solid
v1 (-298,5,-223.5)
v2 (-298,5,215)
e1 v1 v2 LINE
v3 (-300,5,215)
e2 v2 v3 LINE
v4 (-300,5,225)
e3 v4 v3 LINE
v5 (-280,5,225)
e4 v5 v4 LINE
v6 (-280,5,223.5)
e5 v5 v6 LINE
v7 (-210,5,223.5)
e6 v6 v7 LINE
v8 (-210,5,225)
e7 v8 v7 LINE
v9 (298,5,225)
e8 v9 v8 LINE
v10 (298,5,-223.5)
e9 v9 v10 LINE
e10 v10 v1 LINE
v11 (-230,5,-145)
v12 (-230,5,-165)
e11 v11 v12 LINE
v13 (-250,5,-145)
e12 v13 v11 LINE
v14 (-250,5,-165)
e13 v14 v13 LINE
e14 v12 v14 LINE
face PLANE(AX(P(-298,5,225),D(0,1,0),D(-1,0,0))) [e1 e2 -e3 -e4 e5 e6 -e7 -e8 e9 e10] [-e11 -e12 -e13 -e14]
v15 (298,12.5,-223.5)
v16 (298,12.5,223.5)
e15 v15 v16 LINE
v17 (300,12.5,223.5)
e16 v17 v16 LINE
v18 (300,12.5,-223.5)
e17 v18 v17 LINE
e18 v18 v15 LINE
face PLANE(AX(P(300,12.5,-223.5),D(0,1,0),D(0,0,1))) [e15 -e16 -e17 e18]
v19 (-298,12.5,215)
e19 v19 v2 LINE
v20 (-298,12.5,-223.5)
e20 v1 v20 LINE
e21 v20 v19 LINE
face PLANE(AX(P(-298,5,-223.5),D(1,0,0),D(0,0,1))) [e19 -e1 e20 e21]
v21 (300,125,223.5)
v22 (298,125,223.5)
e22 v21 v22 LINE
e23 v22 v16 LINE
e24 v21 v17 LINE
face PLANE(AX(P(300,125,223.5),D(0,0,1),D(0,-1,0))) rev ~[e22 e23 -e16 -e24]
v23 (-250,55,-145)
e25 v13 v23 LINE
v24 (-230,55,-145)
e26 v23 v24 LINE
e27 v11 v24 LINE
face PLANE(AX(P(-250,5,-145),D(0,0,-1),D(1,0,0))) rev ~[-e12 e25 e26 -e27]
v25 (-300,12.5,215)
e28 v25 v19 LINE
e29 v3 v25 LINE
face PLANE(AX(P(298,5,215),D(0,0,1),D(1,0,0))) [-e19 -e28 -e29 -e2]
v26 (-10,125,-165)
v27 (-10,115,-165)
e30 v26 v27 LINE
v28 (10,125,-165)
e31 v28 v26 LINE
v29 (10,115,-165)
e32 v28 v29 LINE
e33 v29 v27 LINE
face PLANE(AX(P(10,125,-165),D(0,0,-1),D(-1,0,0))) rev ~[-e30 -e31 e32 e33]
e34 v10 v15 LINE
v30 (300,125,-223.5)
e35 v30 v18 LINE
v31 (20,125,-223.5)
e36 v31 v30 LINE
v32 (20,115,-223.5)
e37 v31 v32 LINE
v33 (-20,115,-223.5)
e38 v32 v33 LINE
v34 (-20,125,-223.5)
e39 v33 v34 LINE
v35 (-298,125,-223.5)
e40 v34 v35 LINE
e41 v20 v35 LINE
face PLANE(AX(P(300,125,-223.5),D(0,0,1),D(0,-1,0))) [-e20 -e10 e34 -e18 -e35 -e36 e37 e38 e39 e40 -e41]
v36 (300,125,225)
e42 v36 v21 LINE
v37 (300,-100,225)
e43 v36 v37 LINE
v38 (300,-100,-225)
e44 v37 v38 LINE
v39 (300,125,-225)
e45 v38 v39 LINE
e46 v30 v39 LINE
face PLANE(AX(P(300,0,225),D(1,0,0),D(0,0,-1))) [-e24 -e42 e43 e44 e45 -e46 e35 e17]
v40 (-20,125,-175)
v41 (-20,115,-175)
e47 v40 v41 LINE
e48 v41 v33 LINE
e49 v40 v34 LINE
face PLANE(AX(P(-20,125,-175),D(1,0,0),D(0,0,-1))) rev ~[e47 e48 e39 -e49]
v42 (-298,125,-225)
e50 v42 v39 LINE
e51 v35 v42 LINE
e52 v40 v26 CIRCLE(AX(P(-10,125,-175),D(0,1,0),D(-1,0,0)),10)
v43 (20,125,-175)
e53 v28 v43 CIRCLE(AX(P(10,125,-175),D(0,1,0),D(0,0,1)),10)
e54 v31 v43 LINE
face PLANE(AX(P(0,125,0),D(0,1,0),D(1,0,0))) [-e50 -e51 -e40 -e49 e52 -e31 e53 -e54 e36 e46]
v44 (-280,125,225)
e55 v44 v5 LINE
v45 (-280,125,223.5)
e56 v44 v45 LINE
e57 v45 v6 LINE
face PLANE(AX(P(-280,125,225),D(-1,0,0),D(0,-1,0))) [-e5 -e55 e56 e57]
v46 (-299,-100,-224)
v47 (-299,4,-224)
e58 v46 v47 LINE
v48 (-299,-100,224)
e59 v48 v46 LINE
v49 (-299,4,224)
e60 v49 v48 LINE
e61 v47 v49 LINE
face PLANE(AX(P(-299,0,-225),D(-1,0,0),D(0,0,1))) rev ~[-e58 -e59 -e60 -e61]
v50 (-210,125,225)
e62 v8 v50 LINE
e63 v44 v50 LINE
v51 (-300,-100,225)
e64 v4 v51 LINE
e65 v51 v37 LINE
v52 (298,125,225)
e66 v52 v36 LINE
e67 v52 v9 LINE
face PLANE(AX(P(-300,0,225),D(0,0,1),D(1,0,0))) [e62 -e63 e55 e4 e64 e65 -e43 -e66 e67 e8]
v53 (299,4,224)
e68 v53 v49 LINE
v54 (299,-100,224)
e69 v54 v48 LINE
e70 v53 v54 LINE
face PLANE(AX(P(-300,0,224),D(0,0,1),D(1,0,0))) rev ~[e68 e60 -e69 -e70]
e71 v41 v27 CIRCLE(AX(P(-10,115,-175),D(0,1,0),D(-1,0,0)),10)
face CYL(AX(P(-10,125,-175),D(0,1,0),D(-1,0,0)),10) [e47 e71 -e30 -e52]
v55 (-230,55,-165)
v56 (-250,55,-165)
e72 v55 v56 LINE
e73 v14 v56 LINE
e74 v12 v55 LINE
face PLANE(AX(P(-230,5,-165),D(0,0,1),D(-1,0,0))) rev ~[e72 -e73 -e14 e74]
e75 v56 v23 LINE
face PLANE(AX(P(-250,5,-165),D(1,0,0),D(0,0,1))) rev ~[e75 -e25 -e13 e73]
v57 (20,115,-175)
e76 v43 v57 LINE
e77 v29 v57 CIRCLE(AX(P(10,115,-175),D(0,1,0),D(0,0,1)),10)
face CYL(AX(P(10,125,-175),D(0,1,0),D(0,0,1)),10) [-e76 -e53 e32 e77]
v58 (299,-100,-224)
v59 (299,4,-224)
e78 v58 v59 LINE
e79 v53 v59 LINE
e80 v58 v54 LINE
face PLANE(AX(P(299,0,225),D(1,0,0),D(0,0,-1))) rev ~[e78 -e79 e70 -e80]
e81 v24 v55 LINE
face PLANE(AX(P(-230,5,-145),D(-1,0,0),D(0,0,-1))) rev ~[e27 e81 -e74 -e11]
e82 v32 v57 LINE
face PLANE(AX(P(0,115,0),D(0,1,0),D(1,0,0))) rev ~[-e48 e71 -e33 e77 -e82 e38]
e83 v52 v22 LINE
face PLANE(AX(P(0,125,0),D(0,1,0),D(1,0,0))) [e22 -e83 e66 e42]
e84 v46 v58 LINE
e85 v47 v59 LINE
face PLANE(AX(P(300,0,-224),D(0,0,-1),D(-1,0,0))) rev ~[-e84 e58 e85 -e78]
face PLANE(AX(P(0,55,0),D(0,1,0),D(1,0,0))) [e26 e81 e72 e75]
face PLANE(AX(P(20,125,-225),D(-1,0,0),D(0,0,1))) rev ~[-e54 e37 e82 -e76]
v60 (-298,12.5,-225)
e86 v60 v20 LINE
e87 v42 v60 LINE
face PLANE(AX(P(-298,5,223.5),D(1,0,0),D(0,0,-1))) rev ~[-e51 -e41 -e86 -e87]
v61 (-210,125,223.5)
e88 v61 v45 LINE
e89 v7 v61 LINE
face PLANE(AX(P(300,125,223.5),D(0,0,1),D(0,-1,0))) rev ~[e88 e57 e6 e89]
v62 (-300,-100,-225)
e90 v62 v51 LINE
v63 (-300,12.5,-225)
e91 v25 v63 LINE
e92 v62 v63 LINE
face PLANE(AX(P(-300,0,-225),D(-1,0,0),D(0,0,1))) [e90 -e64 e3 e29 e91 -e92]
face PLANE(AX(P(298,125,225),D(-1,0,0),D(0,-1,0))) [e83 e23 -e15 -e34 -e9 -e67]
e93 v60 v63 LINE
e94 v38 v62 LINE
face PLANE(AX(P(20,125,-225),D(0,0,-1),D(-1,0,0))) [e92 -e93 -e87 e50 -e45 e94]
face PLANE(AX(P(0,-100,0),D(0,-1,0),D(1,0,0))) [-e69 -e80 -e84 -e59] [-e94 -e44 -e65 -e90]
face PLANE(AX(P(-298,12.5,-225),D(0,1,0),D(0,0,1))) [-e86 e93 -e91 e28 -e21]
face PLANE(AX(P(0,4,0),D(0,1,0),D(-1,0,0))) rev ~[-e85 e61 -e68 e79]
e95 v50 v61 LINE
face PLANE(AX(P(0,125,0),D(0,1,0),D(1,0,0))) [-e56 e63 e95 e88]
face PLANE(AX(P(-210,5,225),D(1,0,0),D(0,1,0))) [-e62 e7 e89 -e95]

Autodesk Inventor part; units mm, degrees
ref_plane "YZ Plane" through (0, 0, 0) normal (1, 0, 0) x (0, 1, 0)
ref_plane "XZ Plane" through (0, 0, 0) normal (0, 1, 0) x (-1, 0, 0)
ref_plane "XY Plane" through (0, 0, 0) normal (0, 0, 1) x (1, 0, 0)
sketch "Sketch1" plane through (0, 0, 0) normal (0, 1, 0) x (-1, 0, 0)
  line L0 (-300, 225) -> (300, 225)
  line L1 (300, 225) -> (300, -225)
  line L2 (300, -225) -> (-300, -225)
  line L3 (-300, -225) -> (-300, 225)
  line L4 (-300, 225) -> (300, -225) construction
  line L5 (300, 225) -> (-300, -225) construction
  point P0 (0, 0)
  dimension "d0" = 600
  dimension "d1" = 450
extrude "Extrusion1" add sketch "Sketch1" along normal blind 5
sketch "Sketch6" plane through (0, 5, 0) normal (0, 1, 0) x (1, 0, 0)
  line L0 (300, 225) -> (-300, 225) projected
  line L1 (-300, -225) -> (300, -225)
  line L2 (300, -225) -> (300, 225)
  line L3 (300, 225) -> (-300, 225)
  line L4 (-300, 225) -> (-300, -225)
  line L5 (-300, -225) -> (300, 225) construction
  line L6 (300, -225) -> (-300, 225) construction
  line L7 (-298, -223.5) -> (298, -223.5)
  line L8 (298, -223.5) -> (298, 223.5)
  line L9 (298, 223.5) -> (-298, 223.5)
  line L10 (-298, 223.5) -> (-298, -223.5)
  line L11 (-298, -223.5) -> (298, 223.5) construction
  line L12 (298, -223.5) -> (-298, 223.5) construction
  point P0 (0, 0)
  dimension "d26" = 2
extrude "Extrusion7" add sketch "Sketch6" along normal blind 120
sketch "Sketch7" plane through (0, 0, 0) normal (0, -1, 0) x (1, 0, 0)
  line L0 (300, 225) -> (300, -225) projected
  line L1 (-300, 225) -> (300, 225)
  line L2 (300, 225) -> (300, -225)
  line L3 (300, -225) -> (-300, -225)
  line L4 (-300, -225) -> (-300, 225)
  line L5 (-300, 225) -> (300, -225) construction
  line L6 (300, 225) -> (-300, -225) construction
  point P0 (0, 0)
extrude "Extrusion8" add sketch "Sketch7" along normal blind 100
shell "Shell1" thickness 1 removed faces 1 at (-100, -100, 75)
mirror "Mirror1" about plane through (0, 0, 0) normal (0, 0, 1)
sketch "Sketch9" plane through (0, 125, 0) normal (0, 1, 0) x (1, 0, 0)
  line L0 (300, 225) -> (-300, 225) projected
  line L1 (-20, 225) -> (20, 225)
  line L2 (20, 225) -> (20, 175)
  line L3 (10, 165) -> (-10, 165)
  line L4 (-20, 175) -> (-20, 225)
  arc A0 (-20, 175) -> (-10, 165) centre (-10, 175) ccw
  arc A1 (10, 165) -> (20, 175) centre (10, 175) ccw
  point P0 (0, 0)
  point P1 (20, 165)
  point P2 (-20, 165)
  point P3 (0, 225)
  dimension "d37" = 40
  dimension "d38" = 60
  dimension "d39" = 10
extrude "Extrusion10" add sketch "Sketch9" against normal blind 10
sketch "Sketch10" plane through (0, 5, 0) normal (0, 1, 0) x (1, 0, 0)
  line L0 (-230, 165) -> (-250, 165)
  line L1 (-250, 165) -> (-250, 145)
  line L2 (-250, 145) -> (-230, 145)
  line L3 (-230, 145) -> (-230, 165)
  line L4 (-300, 225) -> (-300, -225) projected
  line L5 (300, 225) -> (-300, 225) projected
  point P0 (0, 0)
  point P1 (-250, 155)
  point P2 (-240, 165)
  dimension "d42" = 20
  dimension "d43" = 20
  dimension "d44" = 50
  dimension "d45" = 60
extrude "Extrusion11" add sketch "Sketch10" along normal blind 50
sketch "Sketch11" plane through (-298, 5, 223.5) normal (1, 0, 0) x (0, 0, -1)
  line L0 (448.5, 120) -> (448.5, -105) projected
  line L1 (0, 120) -> (448.5, 120)
  line L2 (448.5, 120) -> (448.5, 7.5)
  line L3 (448.5, 7.5) -> (0, 7.5)
  line L4 (0, 7.5) -> (0, 120)
  point P0 (223.5, -5)
extrude "Extrusion12" cut sketch "Sketch11" against normal through all
sketch "Sketch12" plane through (300, 125, 225) normal (1, 0, 0) x (0, 0, -1)
  line L0 (1.5, 0) -> (1.5, -112.5) projected
  line L1 (448.5, -120) -> (448.5, -112.5) projected
  line L2 (1.5, 0) -> (448.5, 0)
  line L3 (448.5, 0) -> (448.5, -112.5)
  line L4 (448.5, -112.5) -> (1.5, -112.5)
  line L5 (1.5, -112.5) -> (1.5, 0)
  point P0 (225, -125)
extrude "Extrusion13" cut sketch "Sketch12" against normal blind 10
sketch "Sketch13" plane through (-300, 125, 225) normal (0, 0, 1) x (1, 0, 0)
  line L0 (2, 0) -> (280, 0) projected
  line L1 (598, -120) -> (2, -120) projected
  line L2 (90, 0) -> (598, 0)
  line L3 (598, 0) -> (598, -120)
  line L4 (598, -120) -> (90, -120)
  line L5 (90, -120) -> (90, 0)
  line L6 (0, -225) -> (0, 0) projected
  point P0 (300, -125)
  point P1 (90, -120)
  dimension "d52" = 90
extrude "Extrusion14" cut sketch "Sketch13" against normal blind 10
sketch "Sketch14" plane through (298, 5, 225) normal (0, 0, 1) x (1, 0, 0)
  line L0 (-598, -105) -> (-598, 120) projected
  line L1 (-596, 0) -> (-508, 0) projected
  line L2 (-598, 120) -> (-578, 120)
  line L3 (-578, 120) -> (-578, 0)
  line L4 (-578, 0) -> (-598, 0)
  line L5 (-598, 0) -> (-598, 120)
  point P0 (-298, -5)
  dimension "d55" = 20
extrude "Extrusion15" cut sketch "Sketch14" against normal blind 10
sketch "Sketch15" plane through (300, -100, -225) normal (0, 0, -1) x (-1, 0, 0)
  point P0 (300, 100)
ref_plane "Work Plane1" through (0, 0, 0) normal (0, 0, 1) x (1, 0, 0)
properties part number "game base"
